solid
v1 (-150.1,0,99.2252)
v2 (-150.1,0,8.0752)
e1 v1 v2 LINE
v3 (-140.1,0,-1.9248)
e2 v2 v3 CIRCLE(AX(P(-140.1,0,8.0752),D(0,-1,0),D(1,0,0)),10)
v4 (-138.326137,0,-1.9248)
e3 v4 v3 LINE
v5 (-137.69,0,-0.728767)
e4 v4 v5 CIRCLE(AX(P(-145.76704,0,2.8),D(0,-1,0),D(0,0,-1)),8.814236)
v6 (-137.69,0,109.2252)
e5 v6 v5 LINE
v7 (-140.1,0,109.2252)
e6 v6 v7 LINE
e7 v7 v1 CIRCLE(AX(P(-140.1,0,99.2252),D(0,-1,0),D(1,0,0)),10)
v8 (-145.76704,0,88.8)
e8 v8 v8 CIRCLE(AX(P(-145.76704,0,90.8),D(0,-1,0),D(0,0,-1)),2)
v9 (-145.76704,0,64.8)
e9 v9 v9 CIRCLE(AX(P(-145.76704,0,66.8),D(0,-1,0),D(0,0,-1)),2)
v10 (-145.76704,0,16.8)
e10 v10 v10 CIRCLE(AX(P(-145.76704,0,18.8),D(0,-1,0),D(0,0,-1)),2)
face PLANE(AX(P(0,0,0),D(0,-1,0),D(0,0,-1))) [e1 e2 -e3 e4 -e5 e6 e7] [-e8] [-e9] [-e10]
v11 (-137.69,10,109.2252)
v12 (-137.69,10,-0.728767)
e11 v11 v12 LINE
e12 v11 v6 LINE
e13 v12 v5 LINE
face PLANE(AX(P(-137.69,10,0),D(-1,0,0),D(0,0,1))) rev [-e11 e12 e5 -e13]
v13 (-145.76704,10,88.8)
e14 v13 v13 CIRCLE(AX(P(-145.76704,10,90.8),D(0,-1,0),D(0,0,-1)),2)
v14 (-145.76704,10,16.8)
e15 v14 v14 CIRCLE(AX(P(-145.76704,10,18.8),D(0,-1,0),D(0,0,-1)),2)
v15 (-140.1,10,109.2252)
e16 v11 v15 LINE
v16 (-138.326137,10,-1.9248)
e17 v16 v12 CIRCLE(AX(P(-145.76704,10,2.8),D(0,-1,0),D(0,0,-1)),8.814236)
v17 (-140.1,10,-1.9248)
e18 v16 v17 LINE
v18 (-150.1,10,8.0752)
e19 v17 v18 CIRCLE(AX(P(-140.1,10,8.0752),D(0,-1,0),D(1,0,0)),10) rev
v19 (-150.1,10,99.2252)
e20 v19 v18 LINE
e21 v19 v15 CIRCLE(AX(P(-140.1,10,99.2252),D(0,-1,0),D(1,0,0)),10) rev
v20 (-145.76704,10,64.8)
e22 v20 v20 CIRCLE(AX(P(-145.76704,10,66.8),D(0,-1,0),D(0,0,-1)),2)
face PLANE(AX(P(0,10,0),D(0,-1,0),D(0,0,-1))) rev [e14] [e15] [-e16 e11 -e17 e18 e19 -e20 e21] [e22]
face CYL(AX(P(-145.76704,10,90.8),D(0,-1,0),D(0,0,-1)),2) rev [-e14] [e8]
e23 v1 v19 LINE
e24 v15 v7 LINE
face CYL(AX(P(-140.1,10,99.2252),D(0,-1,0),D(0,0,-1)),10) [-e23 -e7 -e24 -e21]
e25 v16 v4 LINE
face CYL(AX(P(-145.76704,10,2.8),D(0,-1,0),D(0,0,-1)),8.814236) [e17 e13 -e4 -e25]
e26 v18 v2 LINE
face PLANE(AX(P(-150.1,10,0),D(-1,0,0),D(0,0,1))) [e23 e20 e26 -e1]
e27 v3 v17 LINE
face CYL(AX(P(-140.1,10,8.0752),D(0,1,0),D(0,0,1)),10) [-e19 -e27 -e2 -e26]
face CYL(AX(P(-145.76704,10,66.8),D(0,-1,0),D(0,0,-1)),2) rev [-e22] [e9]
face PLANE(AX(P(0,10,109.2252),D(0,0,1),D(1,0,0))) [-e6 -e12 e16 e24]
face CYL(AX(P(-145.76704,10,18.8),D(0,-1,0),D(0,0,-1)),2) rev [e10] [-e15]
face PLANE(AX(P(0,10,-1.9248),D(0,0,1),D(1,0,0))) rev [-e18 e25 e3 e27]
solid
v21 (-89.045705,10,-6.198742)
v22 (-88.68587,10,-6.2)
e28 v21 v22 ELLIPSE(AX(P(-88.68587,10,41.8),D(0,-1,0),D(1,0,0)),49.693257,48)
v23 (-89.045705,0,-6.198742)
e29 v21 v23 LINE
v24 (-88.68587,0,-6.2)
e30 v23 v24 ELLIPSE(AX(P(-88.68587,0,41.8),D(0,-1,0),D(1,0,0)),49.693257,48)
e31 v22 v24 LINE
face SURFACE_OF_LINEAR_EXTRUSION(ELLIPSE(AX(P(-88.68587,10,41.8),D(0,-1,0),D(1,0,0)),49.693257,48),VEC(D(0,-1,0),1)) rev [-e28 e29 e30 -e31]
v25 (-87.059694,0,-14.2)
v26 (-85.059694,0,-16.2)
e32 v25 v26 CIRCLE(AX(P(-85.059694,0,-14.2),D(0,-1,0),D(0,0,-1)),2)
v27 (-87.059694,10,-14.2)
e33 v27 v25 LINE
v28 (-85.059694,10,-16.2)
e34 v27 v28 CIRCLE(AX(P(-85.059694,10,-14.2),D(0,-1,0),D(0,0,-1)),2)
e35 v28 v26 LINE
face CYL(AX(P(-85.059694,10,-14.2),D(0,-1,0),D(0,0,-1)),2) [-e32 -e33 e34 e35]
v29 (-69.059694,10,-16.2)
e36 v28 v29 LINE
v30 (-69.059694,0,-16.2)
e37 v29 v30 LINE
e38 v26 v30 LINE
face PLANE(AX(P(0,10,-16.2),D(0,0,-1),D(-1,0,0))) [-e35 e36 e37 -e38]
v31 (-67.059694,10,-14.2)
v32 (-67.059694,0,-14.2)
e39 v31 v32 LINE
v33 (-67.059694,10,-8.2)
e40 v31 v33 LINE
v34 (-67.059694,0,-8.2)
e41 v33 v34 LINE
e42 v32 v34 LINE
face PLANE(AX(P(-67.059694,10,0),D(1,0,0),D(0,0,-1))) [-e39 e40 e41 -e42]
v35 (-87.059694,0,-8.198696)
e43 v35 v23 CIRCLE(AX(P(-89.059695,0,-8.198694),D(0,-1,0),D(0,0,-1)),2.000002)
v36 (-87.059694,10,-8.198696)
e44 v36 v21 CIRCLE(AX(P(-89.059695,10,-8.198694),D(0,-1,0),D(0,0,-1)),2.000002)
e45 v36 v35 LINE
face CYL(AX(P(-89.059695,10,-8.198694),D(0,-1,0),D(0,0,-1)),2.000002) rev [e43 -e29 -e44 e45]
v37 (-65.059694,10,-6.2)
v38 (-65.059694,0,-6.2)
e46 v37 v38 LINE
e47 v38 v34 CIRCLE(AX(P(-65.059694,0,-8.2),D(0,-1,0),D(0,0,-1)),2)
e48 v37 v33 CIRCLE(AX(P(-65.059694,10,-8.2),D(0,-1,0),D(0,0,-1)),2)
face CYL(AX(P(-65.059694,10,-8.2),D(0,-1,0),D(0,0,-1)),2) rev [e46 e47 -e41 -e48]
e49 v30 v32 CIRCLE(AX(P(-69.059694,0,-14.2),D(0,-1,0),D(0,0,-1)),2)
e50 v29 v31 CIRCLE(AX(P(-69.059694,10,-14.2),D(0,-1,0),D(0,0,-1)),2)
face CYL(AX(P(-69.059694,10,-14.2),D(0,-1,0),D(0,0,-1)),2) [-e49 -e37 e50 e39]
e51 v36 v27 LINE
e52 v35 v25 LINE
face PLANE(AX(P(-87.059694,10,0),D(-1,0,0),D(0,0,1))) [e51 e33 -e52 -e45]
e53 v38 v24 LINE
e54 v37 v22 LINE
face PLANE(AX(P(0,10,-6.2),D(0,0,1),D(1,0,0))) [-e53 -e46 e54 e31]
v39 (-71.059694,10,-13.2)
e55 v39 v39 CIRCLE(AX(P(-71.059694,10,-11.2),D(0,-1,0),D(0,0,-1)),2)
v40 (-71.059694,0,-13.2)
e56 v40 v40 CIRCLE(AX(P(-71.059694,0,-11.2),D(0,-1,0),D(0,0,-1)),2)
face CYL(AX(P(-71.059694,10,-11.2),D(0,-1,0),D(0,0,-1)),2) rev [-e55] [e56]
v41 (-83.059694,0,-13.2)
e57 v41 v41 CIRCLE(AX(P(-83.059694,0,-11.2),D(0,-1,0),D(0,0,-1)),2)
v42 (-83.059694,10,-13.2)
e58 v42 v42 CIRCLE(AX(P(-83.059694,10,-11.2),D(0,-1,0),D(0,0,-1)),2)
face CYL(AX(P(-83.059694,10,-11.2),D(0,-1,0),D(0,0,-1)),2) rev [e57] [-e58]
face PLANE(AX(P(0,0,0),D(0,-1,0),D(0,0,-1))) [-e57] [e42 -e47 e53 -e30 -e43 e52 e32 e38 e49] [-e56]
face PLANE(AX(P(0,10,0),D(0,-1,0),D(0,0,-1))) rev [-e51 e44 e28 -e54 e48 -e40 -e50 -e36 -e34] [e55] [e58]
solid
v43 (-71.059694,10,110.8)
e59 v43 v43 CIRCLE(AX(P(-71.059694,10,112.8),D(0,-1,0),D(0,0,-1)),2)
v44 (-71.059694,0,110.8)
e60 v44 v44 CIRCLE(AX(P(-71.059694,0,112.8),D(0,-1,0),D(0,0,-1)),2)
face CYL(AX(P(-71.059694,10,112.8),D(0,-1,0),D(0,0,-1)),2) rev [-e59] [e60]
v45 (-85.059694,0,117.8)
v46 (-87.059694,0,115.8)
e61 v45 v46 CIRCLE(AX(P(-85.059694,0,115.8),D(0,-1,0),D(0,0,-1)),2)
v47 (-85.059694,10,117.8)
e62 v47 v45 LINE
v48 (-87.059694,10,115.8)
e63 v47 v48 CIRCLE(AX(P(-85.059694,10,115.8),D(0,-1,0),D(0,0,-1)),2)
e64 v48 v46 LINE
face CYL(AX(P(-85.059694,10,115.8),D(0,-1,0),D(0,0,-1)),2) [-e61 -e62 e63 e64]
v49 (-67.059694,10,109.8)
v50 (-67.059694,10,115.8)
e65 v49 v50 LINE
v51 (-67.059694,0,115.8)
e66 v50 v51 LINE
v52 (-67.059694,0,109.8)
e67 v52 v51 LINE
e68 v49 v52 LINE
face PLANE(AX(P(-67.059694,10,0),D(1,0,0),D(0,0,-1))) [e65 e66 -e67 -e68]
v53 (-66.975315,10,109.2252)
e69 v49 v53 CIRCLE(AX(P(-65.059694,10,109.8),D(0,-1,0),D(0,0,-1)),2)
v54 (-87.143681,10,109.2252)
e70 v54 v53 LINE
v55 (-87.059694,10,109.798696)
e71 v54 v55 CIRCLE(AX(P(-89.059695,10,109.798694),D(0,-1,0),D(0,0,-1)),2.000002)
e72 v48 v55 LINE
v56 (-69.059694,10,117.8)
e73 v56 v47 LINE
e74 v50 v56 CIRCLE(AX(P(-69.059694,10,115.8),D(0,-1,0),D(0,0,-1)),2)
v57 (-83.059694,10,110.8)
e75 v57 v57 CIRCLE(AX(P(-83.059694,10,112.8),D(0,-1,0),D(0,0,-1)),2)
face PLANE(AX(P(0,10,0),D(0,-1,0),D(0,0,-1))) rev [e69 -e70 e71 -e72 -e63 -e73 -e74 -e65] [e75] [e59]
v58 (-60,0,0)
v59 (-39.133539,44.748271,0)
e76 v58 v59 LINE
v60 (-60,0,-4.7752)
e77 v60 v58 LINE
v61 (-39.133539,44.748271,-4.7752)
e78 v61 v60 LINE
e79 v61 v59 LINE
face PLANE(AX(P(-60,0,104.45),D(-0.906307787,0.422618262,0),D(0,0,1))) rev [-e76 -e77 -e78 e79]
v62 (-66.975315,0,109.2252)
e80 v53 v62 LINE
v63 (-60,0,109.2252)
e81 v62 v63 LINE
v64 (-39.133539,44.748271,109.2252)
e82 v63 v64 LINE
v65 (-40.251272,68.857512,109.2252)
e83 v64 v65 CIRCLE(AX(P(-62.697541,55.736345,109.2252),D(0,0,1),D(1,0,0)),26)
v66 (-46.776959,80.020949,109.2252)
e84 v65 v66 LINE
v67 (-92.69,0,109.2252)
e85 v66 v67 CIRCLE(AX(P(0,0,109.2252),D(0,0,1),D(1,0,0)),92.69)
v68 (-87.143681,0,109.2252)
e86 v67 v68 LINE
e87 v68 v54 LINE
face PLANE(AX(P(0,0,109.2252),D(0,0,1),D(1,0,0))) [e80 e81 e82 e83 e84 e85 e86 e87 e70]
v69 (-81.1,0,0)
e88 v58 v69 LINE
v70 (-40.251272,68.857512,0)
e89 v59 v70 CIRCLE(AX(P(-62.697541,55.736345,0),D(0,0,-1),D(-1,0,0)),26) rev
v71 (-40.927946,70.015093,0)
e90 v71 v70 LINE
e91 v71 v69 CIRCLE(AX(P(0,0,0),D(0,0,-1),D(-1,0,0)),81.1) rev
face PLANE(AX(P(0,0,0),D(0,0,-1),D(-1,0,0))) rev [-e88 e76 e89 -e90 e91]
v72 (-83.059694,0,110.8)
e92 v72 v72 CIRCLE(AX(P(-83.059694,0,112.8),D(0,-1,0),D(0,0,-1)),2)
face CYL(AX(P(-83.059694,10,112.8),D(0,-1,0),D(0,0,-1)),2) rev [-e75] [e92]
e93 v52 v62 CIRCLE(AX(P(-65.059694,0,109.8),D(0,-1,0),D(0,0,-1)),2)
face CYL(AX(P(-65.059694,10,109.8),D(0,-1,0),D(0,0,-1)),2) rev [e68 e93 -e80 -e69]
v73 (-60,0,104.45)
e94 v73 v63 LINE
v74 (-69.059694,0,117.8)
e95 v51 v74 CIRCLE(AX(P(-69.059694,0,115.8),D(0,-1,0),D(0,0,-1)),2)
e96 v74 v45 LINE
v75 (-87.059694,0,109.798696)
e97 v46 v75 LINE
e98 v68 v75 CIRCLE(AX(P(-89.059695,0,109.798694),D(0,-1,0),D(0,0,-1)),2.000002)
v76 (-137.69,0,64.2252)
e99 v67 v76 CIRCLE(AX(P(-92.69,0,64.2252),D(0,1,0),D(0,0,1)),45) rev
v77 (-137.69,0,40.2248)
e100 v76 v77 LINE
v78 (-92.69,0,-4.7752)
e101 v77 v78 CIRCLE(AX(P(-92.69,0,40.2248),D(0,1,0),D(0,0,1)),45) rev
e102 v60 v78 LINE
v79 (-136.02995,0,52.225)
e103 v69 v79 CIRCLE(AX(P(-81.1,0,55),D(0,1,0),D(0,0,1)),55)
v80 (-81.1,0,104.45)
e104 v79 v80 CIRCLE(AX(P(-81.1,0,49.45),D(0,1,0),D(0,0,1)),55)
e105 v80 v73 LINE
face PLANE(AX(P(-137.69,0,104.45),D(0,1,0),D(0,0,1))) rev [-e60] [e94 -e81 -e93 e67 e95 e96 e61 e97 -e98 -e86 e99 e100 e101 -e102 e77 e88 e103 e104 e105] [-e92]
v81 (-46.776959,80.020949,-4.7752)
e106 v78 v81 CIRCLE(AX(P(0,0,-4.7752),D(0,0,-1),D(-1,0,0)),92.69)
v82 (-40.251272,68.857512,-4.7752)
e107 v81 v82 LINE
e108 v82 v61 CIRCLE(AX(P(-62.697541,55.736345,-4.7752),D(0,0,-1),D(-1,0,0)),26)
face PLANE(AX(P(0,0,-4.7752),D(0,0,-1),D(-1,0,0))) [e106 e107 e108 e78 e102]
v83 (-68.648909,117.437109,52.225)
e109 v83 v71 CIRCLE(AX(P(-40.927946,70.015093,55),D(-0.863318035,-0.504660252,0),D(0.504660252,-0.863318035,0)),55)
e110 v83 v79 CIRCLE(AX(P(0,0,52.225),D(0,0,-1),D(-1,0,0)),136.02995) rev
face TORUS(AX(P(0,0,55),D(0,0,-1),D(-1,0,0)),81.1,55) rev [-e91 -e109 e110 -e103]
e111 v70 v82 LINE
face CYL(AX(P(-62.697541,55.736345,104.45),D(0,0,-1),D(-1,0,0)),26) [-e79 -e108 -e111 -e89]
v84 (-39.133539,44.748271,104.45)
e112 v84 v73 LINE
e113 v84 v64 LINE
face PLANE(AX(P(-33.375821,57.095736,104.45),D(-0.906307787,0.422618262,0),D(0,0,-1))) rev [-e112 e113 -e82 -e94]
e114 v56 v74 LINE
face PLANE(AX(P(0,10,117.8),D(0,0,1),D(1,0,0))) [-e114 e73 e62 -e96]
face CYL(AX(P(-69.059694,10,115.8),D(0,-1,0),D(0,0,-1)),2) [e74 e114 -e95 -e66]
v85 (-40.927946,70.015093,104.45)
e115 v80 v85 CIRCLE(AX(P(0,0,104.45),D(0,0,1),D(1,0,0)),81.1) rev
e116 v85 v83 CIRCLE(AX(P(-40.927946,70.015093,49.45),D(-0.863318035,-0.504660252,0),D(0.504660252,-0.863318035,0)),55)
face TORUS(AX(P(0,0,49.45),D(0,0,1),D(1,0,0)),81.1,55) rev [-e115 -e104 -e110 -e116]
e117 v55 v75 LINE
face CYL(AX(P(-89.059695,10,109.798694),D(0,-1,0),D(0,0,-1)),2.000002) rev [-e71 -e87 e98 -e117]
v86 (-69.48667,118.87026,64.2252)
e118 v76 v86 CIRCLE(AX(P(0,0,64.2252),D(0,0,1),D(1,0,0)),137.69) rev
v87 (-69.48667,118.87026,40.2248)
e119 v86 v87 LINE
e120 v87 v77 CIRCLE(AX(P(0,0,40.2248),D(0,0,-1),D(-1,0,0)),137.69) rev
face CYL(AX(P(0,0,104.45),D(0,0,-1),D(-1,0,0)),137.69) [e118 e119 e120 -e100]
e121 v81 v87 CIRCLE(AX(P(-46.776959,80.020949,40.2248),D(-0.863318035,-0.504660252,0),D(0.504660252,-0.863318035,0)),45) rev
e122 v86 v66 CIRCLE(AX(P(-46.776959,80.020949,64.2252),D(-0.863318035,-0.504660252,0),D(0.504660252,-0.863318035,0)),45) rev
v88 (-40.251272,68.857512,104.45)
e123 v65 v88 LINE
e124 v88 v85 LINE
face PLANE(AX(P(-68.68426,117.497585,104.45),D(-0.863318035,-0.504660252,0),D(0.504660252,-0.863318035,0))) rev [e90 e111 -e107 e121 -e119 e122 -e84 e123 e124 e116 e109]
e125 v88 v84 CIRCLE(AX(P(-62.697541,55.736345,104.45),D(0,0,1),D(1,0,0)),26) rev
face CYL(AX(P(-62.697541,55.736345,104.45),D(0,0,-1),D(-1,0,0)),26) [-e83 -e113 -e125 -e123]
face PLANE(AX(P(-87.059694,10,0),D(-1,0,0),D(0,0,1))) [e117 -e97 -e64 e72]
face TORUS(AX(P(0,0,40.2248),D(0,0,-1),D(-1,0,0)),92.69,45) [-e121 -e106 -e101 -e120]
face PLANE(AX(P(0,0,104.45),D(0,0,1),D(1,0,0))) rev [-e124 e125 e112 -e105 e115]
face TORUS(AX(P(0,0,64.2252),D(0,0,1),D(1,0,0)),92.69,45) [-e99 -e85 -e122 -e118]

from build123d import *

# Parameters (mm, degrees)
BOSS_EXTRUDE1_DEPTH = 104.45
BOSS_EXTRUDE2_DEPTH = 4.7752
BOSS_EXTRUDE3_START = 4.7752
BOSS_EXTRUDE3_DEPTH = 4.7752
SKETCH4_R           = 1.9999999999999967
SKETCH4_R_2         = 1.9999999999999962
BOSS_EXTRUDE4_DEPTH = 10
FILLET1_R           = 10
FILLET3_R           = 55
FILLET4_R           = 45
CHAMFER1_SIZE       = 60.00000000000001
CHAMFER1_SIZE2      = 66.13522872048569
FILLET5_R           = 26


with BuildPart() as part:
    # Sketch1 → Boss-Extrude1 (new body)
    with BuildSketch(Plane.XY):
        with BuildLine():
            Line((-137.69000000000003, 0), (-136.1, 0))
            ThreePointArc((-136.1, 0), (-118.0490106345522, 67.73212744483506), (-68.68426027621781, 117.49758461478588))
            Line((-68.68426027621781, 117.49758461478588), (-69.48667007665269, 118.87026029103507))
            ThreePointArc((-69.48667007665269, 118.87026029103507), (-119.42812839288389, 68.52341387126629), (-137.69000000000003, 0))
        make_face()
    extrude(amount=BOSS_EXTRUDE1_DEPTH)

    # Sketch2 → Boss-Extrude2 (add)
    with BuildSketch(Plane.XY.offset(104.45)):
        with BuildLine():
            Line((-137.69000000000003, 1.686e-14), (0, 0))
            Line((0, 0), (-69.48667007665271, 118.87026029103507))
            ThreePointArc((-69.48667007665271, 118.87026029103507), (-119.42812839288392, 68.5234138712663), (-137.69000000000003, 1.686e-14))
        make_face()
    extrude(amount=BOSS_EXTRUDE2_DEPTH)

    # Sketch3 → Boss-Extrude3 (add)
    with BuildSketch(Plane(origin=(0, 0, 0), x_dir=(-1, 0, 0), z_dir=(0, 0, -1)).offset(BOSS_EXTRUDE3_START)):
        with BuildLine():
            Line((0, 0), (137.69000000000003, 1.686e-14))
            ThreePointArc((137.69000000000003, 1.686e-14), (119.42812839288389, 68.52341387126629), (69.4866700766527, 118.87026029103508))
            Line((69.4866700766527, 118.87026029103508), (0, 0))
        make_face()
    extrude(amount=-BOSS_EXTRUDE3_DEPTH)

    # Sketch4 → Boss-Extrude4 (add)
    # profile 1 of 5: a face of its own
    with BuildSketch(Plane.XZ):
        with BuildLine():
            Line((-137.69000000000003, 6.328766650845793), (-137.69000000000003, 109.2252))
            Line((-137.69000000000003, 109.2252), (-150.10000000000002, 109.2252))
            Line((-150.10000000000002, 109.2252), (-150.10000000000002, 10.475690213138677))
            ThreePointArc((-150.10000000000002, 10.475690213138678), (-142.97351570054127, 11.159843802640754), (-137.69000000000005, 6.32876665084579))
        make_face()
        with Locations(Location((-145.76703973293544, 18.800000000059715, 0), (0, 0, 270))):
            Circle(SKETCH4_R, mode=Mode.SUBTRACT)
        with Locations(Location((-145.76703973293542, 66.8000000000597, 0), (0, 0, 270))):
            Circle(SKETCH4_R, mode=Mode.SUBTRACT)
        with Locations(Location((-145.7670397329354, 90.80000000005973, 0), (0, 0, 270))):
            Circle(SKETCH4_R, mode=Mode.SUBTRACT)
    # profile 2 of 5: a face of its own
    with BuildSketch(Plane.XZ):
        with BuildLine():
            ThreePointArc((-87.05969357051328, 109.79869615131716), (-87.0808016736092, 109.50888942519616), (-87.14368092736706, 109.22519999999997))
            Line((-87.14368092736706, 109.2252), (-66.97531486918743, 109.2252))
            ThreePointArc((-66.97531486918743, 109.22520000000003), (-67.03848645979555, 109.50951987797353), (-67.05969357051326, 109.80000000005735))
            Line((-67.05969357051326, 109.80000000005735), (-67.05969357051326, 115.80000000005734))
            ThreePointArc((-67.05969357051328, 115.80000000005734), (-67.64548000814017, 117.21421356243043), (-69.05969357051326, 117.80000000005734))
            Line((-69.05969357051326, 117.80000000005734), (-85.05969357051326, 117.80000000005734))
            ThreePointArc((-85.05969357051326, 117.80000000005734), (-86.47390713288635, 117.21421356243043), (-87.05969357051328, 115.80000000005734))
            Line((-87.05969357051328, 115.80000000005734), (-87.05969357051328, 109.79869615131716))
        make_face()
        with Locations(Location((-83.05969357051332, 112.8000000000573, 0), (0, 0, 270))):
            Circle(SKETCH4_R, mode=Mode.SUBTRACT)
        with Locations(Location((-71.05969357051333, 112.8000000000573, 0), (0, 0, 270))):
            Circle(SKETCH4_R, mode=Mode.SUBTRACT)
    # profile 3 of 5: a face of its own
    with BuildSketch(Plane.XZ):
        with BuildLine():
            Line((-137.69000000000003, -0.7287666507264419), (-137.69000000000003, 6.328766650845793))
            ThreePointArc((-137.69000000000005, 6.32876665084579), (-142.97351570054127, 11.159843802640754), (-150.10000000000002, 10.475690213138678))
            Line((-150.10000000000002, 10.475690213138677), (-150.10000000000002, -1.9248000000000047))
            Line((-150.10000000000002, -1.9248000000000043), (-138.32613724180214, -1.9248000000000043))
            ThreePointArc((-138.32613724180214, -1.924799999999971), (-137.98505690973883, -1.3390226215975511), (-137.69000000000005, -0.7287666507264476))
        make_face()
    # profile 4 of 5: a face of its own
    with BuildSketch(Plane.XZ):
        with BuildLine():
            add(Edge.make_bspline(
                [(-89.04570479198645, -6.19874157019467), (-88.86578961884237, -6.199999999942648), (-88.685869728687, -6.199999999942648)],
                knots=[4.705147792502203, 4.705147792502203, 4.705147792502203, 4.71238898038469, 4.71238898038469, 4.71238898038469], degree=2, weights=[1, 0.9999934456569163, 1]))
            Line((-88.685869728687, -6.199999999942648), (-65.0596935705133, -6.1999999999426825))
            ThreePointArc((-65.0596935705133, -6.1999999999426825), (-66.47390713288638, -6.7857864375695796), (-67.0596935705133, -8.199999999942657))
            Line((-67.0596935705133, -8.199999999942657), (-67.0596935705133, -14.199999999942719))
            ThreePointArc((-67.0596935705133, -14.199999999942719), (-67.64548000814021, -15.614213562315815), (-69.0596935705133, -16.19999999994272))
            Line((-69.0596935705133, -16.19999999994272), (-85.05969357051329, -16.199999999942712))
            ThreePointArc((-85.05969357051329, -16.199999999942712), (-86.4739071328864, -15.614213562315818), (-87.0596935705133, -14.199999999942714))
            Line((-87.0596935705133, -14.199999999942714), (-87.0596935705133, -8.19869615120245))
            ThreePointArc((-87.0596935705133, -8.19869615120245), (-87.64054213015943, -6.789435301837706), (-89.04570479198645, -6.19874157019467))
        make_face()
        with Locations(Location((-83.05969357051332, -11.199999999942742, 0), (0, 0, 270))):
            Circle(SKETCH4_R_2, mode=Mode.SUBTRACT)
        with Locations(Location((-71.05969357051333, -11.199999999942742, 0), (0, 0, 269.999999999))):
            Circle(SKETCH4_R_2, mode=Mode.SUBTRACT)
    # profile 5 of 5: a face of its own
    with BuildSketch(Plane.XZ):
        with BuildLine():
            Line((-66.97531486918743, 109.2252), (-87.14368092736706, 109.2252))
            ThreePointArc((-87.14368092736706, 109.22519999999997), (-87.85972630188988, 108.19866898049219), (-89.04570479198642, 107.79874157030937))
            add(Edge.make_bspline(
                [(-88.68586972868695, 107.80000000005735), (-88.86578961884233, 107.80000000005735), (-89.04570479198642, 107.79874157030937)],
                knots=[4.71238898038469, 4.71238898038469, 4.71238898038469, 4.719630168267177, 4.719630168267177, 4.719630168267177], degree=2, weights=[1, 0.9999934456569163, 1]))
            Line((-88.68586972868694, 107.80000000005735), (-65.05969357051326, 107.80000000005735))
            ThreePointArc((-65.05969357051326, 107.80000000005735), (-66.25351097696311, 108.19538166535676), (-66.97531486918743, 109.22520000000003))
        make_face()
    extrude(amount=-BOSS_EXTRUDE4_DEPTH)


with BuildPart() as boss_extrude4_piece_1:
    # of the separate pieces the step leaves, piece 1, a body of its own (boss_extrude4_pieces)
    add(part.part.solids().sort_by_distance((-68.684260276, 117.497584615, 0))[0])

    # Fillet3
    # the kernel refuses this fillet: 55 mm, written as the material it adds along each edge
    with BuildSketch(Plane(origin=(9.948e-14, -5.329e-14, 104.45), x_dir=(-1, 3.9e-16, 0), z_dir=(-3.9e-16, -1, 0))) as fillet3_piece_1:
        with BuildLine():
            CenterArc((136.10000000000014 - FILLET3_R, FILLET3_R), FILLET3_R, 270, 90)
            Line((136.10000000000014 - FILLET3_R, -1.421e-14), (136.10000000000014, 0))
            Line((136.10000000000014, 0), (136.10000000000014, FILLET3_R))
        make_face()
    revolve(axis=Axis((9.948e-14, -5.329e-14, 104.45), (0, 0, -1)), revolution_arc=59.69119827809603)
    with BuildSketch(Plane(origin=(9.948e-14, -5.329e-14, 0), x_dir=(-1, 3.9e-16, 0), z_dir=(-3.9e-16, -1, 0))) as fillet3_piece_2:
        with BuildLine():
            CenterArc((136.10000000000014 - FILLET3_R, -FILLET3_R), FILLET3_R, 0, 90)
            Line((136.10000000000014 - FILLET3_R, 7.11e-15), (136.10000000000014, 0))
            Line((136.10000000000014, 0), (136.10000000000014, -FILLET3_R))
        make_face()
    revolve(axis=Axis((9.948e-14, -5.329e-14, 0), (0, 0, -1)), revolution_arc=59.69119827809603)

    # Fillet4
    fillet4_edges = [boss_extrude4_piece_1.edges().sort_by_distance(p)[0] for p in [
        (-119.42812839288393, 68.52341387126631, 109.2252),
        (-119.4281283928839, 68.5234138712663, -4.7752),
    ]]
    fillet(fillet4_edges, radius=FILLET4_R)

    # Chamfer1
    chamfer1_edges = [boss_extrude4_piece_1.edges().sort_by_distance(p)[0] for p in [
        (0, 0, 106.83760000000001),
        (0, 0, -2.3876),
    ]]
    chamfer1_side = [boss_extrude4_piece_1.faces().sort_by_distance(p)[0] for p in [
        (-46.345000000000006, 5.68e-15, -2.9317462886429677),
    ]]
    chamfer(chamfer1_edges, length=CHAMFER1_SIZE, length2=CHAMFER1_SIZE2, reference=chamfer1_side[0])

    # Fillet5
    fillet5_edges = [boss_extrude4_piece_1.edges().sort_by_distance(p)[0] for p in [
        (-33.37582118196211, 57.09573572816664, 106.83760000000001),
        (-33.37582118196211, 57.09573572816664, -2.3876),
    ]]
    fillet(fillet5_edges, radius=FILLET5_R)


with BuildPart() as boss_extrude4_piece_2:
    # of the separate pieces the step leaves, piece 2, a body of its own (boss_extrude4_pieces)
    add(part.part.solids().sort_by_distance((-137.69, 10, 109.2252))[0])

    # Fillet1
    fillet1_edges = [boss_extrude4_piece_2.edges().sort_by_distance(p)[0] for p in [
        (-150.10000000000002, 5, 109.2252),
        (-150.10000000000002, 5, -1.9248000000000045),
    ]]
    fillet(fillet1_edges, radius=FILLET1_R)


with BuildPart() as boss_extrude4_piece_3:
    # of the separate pieces the step leaves, piece 3, a body of its own (boss_extrude4_pieces)
    add(part.part.solids().sort_by_distance((-89.045704792, 0, -6.19874157))[0])


solid = Compound([boss_extrude4_piece_1.part, boss_extrude4_piece_2.part, boss_extrude4_piece_3.part])
